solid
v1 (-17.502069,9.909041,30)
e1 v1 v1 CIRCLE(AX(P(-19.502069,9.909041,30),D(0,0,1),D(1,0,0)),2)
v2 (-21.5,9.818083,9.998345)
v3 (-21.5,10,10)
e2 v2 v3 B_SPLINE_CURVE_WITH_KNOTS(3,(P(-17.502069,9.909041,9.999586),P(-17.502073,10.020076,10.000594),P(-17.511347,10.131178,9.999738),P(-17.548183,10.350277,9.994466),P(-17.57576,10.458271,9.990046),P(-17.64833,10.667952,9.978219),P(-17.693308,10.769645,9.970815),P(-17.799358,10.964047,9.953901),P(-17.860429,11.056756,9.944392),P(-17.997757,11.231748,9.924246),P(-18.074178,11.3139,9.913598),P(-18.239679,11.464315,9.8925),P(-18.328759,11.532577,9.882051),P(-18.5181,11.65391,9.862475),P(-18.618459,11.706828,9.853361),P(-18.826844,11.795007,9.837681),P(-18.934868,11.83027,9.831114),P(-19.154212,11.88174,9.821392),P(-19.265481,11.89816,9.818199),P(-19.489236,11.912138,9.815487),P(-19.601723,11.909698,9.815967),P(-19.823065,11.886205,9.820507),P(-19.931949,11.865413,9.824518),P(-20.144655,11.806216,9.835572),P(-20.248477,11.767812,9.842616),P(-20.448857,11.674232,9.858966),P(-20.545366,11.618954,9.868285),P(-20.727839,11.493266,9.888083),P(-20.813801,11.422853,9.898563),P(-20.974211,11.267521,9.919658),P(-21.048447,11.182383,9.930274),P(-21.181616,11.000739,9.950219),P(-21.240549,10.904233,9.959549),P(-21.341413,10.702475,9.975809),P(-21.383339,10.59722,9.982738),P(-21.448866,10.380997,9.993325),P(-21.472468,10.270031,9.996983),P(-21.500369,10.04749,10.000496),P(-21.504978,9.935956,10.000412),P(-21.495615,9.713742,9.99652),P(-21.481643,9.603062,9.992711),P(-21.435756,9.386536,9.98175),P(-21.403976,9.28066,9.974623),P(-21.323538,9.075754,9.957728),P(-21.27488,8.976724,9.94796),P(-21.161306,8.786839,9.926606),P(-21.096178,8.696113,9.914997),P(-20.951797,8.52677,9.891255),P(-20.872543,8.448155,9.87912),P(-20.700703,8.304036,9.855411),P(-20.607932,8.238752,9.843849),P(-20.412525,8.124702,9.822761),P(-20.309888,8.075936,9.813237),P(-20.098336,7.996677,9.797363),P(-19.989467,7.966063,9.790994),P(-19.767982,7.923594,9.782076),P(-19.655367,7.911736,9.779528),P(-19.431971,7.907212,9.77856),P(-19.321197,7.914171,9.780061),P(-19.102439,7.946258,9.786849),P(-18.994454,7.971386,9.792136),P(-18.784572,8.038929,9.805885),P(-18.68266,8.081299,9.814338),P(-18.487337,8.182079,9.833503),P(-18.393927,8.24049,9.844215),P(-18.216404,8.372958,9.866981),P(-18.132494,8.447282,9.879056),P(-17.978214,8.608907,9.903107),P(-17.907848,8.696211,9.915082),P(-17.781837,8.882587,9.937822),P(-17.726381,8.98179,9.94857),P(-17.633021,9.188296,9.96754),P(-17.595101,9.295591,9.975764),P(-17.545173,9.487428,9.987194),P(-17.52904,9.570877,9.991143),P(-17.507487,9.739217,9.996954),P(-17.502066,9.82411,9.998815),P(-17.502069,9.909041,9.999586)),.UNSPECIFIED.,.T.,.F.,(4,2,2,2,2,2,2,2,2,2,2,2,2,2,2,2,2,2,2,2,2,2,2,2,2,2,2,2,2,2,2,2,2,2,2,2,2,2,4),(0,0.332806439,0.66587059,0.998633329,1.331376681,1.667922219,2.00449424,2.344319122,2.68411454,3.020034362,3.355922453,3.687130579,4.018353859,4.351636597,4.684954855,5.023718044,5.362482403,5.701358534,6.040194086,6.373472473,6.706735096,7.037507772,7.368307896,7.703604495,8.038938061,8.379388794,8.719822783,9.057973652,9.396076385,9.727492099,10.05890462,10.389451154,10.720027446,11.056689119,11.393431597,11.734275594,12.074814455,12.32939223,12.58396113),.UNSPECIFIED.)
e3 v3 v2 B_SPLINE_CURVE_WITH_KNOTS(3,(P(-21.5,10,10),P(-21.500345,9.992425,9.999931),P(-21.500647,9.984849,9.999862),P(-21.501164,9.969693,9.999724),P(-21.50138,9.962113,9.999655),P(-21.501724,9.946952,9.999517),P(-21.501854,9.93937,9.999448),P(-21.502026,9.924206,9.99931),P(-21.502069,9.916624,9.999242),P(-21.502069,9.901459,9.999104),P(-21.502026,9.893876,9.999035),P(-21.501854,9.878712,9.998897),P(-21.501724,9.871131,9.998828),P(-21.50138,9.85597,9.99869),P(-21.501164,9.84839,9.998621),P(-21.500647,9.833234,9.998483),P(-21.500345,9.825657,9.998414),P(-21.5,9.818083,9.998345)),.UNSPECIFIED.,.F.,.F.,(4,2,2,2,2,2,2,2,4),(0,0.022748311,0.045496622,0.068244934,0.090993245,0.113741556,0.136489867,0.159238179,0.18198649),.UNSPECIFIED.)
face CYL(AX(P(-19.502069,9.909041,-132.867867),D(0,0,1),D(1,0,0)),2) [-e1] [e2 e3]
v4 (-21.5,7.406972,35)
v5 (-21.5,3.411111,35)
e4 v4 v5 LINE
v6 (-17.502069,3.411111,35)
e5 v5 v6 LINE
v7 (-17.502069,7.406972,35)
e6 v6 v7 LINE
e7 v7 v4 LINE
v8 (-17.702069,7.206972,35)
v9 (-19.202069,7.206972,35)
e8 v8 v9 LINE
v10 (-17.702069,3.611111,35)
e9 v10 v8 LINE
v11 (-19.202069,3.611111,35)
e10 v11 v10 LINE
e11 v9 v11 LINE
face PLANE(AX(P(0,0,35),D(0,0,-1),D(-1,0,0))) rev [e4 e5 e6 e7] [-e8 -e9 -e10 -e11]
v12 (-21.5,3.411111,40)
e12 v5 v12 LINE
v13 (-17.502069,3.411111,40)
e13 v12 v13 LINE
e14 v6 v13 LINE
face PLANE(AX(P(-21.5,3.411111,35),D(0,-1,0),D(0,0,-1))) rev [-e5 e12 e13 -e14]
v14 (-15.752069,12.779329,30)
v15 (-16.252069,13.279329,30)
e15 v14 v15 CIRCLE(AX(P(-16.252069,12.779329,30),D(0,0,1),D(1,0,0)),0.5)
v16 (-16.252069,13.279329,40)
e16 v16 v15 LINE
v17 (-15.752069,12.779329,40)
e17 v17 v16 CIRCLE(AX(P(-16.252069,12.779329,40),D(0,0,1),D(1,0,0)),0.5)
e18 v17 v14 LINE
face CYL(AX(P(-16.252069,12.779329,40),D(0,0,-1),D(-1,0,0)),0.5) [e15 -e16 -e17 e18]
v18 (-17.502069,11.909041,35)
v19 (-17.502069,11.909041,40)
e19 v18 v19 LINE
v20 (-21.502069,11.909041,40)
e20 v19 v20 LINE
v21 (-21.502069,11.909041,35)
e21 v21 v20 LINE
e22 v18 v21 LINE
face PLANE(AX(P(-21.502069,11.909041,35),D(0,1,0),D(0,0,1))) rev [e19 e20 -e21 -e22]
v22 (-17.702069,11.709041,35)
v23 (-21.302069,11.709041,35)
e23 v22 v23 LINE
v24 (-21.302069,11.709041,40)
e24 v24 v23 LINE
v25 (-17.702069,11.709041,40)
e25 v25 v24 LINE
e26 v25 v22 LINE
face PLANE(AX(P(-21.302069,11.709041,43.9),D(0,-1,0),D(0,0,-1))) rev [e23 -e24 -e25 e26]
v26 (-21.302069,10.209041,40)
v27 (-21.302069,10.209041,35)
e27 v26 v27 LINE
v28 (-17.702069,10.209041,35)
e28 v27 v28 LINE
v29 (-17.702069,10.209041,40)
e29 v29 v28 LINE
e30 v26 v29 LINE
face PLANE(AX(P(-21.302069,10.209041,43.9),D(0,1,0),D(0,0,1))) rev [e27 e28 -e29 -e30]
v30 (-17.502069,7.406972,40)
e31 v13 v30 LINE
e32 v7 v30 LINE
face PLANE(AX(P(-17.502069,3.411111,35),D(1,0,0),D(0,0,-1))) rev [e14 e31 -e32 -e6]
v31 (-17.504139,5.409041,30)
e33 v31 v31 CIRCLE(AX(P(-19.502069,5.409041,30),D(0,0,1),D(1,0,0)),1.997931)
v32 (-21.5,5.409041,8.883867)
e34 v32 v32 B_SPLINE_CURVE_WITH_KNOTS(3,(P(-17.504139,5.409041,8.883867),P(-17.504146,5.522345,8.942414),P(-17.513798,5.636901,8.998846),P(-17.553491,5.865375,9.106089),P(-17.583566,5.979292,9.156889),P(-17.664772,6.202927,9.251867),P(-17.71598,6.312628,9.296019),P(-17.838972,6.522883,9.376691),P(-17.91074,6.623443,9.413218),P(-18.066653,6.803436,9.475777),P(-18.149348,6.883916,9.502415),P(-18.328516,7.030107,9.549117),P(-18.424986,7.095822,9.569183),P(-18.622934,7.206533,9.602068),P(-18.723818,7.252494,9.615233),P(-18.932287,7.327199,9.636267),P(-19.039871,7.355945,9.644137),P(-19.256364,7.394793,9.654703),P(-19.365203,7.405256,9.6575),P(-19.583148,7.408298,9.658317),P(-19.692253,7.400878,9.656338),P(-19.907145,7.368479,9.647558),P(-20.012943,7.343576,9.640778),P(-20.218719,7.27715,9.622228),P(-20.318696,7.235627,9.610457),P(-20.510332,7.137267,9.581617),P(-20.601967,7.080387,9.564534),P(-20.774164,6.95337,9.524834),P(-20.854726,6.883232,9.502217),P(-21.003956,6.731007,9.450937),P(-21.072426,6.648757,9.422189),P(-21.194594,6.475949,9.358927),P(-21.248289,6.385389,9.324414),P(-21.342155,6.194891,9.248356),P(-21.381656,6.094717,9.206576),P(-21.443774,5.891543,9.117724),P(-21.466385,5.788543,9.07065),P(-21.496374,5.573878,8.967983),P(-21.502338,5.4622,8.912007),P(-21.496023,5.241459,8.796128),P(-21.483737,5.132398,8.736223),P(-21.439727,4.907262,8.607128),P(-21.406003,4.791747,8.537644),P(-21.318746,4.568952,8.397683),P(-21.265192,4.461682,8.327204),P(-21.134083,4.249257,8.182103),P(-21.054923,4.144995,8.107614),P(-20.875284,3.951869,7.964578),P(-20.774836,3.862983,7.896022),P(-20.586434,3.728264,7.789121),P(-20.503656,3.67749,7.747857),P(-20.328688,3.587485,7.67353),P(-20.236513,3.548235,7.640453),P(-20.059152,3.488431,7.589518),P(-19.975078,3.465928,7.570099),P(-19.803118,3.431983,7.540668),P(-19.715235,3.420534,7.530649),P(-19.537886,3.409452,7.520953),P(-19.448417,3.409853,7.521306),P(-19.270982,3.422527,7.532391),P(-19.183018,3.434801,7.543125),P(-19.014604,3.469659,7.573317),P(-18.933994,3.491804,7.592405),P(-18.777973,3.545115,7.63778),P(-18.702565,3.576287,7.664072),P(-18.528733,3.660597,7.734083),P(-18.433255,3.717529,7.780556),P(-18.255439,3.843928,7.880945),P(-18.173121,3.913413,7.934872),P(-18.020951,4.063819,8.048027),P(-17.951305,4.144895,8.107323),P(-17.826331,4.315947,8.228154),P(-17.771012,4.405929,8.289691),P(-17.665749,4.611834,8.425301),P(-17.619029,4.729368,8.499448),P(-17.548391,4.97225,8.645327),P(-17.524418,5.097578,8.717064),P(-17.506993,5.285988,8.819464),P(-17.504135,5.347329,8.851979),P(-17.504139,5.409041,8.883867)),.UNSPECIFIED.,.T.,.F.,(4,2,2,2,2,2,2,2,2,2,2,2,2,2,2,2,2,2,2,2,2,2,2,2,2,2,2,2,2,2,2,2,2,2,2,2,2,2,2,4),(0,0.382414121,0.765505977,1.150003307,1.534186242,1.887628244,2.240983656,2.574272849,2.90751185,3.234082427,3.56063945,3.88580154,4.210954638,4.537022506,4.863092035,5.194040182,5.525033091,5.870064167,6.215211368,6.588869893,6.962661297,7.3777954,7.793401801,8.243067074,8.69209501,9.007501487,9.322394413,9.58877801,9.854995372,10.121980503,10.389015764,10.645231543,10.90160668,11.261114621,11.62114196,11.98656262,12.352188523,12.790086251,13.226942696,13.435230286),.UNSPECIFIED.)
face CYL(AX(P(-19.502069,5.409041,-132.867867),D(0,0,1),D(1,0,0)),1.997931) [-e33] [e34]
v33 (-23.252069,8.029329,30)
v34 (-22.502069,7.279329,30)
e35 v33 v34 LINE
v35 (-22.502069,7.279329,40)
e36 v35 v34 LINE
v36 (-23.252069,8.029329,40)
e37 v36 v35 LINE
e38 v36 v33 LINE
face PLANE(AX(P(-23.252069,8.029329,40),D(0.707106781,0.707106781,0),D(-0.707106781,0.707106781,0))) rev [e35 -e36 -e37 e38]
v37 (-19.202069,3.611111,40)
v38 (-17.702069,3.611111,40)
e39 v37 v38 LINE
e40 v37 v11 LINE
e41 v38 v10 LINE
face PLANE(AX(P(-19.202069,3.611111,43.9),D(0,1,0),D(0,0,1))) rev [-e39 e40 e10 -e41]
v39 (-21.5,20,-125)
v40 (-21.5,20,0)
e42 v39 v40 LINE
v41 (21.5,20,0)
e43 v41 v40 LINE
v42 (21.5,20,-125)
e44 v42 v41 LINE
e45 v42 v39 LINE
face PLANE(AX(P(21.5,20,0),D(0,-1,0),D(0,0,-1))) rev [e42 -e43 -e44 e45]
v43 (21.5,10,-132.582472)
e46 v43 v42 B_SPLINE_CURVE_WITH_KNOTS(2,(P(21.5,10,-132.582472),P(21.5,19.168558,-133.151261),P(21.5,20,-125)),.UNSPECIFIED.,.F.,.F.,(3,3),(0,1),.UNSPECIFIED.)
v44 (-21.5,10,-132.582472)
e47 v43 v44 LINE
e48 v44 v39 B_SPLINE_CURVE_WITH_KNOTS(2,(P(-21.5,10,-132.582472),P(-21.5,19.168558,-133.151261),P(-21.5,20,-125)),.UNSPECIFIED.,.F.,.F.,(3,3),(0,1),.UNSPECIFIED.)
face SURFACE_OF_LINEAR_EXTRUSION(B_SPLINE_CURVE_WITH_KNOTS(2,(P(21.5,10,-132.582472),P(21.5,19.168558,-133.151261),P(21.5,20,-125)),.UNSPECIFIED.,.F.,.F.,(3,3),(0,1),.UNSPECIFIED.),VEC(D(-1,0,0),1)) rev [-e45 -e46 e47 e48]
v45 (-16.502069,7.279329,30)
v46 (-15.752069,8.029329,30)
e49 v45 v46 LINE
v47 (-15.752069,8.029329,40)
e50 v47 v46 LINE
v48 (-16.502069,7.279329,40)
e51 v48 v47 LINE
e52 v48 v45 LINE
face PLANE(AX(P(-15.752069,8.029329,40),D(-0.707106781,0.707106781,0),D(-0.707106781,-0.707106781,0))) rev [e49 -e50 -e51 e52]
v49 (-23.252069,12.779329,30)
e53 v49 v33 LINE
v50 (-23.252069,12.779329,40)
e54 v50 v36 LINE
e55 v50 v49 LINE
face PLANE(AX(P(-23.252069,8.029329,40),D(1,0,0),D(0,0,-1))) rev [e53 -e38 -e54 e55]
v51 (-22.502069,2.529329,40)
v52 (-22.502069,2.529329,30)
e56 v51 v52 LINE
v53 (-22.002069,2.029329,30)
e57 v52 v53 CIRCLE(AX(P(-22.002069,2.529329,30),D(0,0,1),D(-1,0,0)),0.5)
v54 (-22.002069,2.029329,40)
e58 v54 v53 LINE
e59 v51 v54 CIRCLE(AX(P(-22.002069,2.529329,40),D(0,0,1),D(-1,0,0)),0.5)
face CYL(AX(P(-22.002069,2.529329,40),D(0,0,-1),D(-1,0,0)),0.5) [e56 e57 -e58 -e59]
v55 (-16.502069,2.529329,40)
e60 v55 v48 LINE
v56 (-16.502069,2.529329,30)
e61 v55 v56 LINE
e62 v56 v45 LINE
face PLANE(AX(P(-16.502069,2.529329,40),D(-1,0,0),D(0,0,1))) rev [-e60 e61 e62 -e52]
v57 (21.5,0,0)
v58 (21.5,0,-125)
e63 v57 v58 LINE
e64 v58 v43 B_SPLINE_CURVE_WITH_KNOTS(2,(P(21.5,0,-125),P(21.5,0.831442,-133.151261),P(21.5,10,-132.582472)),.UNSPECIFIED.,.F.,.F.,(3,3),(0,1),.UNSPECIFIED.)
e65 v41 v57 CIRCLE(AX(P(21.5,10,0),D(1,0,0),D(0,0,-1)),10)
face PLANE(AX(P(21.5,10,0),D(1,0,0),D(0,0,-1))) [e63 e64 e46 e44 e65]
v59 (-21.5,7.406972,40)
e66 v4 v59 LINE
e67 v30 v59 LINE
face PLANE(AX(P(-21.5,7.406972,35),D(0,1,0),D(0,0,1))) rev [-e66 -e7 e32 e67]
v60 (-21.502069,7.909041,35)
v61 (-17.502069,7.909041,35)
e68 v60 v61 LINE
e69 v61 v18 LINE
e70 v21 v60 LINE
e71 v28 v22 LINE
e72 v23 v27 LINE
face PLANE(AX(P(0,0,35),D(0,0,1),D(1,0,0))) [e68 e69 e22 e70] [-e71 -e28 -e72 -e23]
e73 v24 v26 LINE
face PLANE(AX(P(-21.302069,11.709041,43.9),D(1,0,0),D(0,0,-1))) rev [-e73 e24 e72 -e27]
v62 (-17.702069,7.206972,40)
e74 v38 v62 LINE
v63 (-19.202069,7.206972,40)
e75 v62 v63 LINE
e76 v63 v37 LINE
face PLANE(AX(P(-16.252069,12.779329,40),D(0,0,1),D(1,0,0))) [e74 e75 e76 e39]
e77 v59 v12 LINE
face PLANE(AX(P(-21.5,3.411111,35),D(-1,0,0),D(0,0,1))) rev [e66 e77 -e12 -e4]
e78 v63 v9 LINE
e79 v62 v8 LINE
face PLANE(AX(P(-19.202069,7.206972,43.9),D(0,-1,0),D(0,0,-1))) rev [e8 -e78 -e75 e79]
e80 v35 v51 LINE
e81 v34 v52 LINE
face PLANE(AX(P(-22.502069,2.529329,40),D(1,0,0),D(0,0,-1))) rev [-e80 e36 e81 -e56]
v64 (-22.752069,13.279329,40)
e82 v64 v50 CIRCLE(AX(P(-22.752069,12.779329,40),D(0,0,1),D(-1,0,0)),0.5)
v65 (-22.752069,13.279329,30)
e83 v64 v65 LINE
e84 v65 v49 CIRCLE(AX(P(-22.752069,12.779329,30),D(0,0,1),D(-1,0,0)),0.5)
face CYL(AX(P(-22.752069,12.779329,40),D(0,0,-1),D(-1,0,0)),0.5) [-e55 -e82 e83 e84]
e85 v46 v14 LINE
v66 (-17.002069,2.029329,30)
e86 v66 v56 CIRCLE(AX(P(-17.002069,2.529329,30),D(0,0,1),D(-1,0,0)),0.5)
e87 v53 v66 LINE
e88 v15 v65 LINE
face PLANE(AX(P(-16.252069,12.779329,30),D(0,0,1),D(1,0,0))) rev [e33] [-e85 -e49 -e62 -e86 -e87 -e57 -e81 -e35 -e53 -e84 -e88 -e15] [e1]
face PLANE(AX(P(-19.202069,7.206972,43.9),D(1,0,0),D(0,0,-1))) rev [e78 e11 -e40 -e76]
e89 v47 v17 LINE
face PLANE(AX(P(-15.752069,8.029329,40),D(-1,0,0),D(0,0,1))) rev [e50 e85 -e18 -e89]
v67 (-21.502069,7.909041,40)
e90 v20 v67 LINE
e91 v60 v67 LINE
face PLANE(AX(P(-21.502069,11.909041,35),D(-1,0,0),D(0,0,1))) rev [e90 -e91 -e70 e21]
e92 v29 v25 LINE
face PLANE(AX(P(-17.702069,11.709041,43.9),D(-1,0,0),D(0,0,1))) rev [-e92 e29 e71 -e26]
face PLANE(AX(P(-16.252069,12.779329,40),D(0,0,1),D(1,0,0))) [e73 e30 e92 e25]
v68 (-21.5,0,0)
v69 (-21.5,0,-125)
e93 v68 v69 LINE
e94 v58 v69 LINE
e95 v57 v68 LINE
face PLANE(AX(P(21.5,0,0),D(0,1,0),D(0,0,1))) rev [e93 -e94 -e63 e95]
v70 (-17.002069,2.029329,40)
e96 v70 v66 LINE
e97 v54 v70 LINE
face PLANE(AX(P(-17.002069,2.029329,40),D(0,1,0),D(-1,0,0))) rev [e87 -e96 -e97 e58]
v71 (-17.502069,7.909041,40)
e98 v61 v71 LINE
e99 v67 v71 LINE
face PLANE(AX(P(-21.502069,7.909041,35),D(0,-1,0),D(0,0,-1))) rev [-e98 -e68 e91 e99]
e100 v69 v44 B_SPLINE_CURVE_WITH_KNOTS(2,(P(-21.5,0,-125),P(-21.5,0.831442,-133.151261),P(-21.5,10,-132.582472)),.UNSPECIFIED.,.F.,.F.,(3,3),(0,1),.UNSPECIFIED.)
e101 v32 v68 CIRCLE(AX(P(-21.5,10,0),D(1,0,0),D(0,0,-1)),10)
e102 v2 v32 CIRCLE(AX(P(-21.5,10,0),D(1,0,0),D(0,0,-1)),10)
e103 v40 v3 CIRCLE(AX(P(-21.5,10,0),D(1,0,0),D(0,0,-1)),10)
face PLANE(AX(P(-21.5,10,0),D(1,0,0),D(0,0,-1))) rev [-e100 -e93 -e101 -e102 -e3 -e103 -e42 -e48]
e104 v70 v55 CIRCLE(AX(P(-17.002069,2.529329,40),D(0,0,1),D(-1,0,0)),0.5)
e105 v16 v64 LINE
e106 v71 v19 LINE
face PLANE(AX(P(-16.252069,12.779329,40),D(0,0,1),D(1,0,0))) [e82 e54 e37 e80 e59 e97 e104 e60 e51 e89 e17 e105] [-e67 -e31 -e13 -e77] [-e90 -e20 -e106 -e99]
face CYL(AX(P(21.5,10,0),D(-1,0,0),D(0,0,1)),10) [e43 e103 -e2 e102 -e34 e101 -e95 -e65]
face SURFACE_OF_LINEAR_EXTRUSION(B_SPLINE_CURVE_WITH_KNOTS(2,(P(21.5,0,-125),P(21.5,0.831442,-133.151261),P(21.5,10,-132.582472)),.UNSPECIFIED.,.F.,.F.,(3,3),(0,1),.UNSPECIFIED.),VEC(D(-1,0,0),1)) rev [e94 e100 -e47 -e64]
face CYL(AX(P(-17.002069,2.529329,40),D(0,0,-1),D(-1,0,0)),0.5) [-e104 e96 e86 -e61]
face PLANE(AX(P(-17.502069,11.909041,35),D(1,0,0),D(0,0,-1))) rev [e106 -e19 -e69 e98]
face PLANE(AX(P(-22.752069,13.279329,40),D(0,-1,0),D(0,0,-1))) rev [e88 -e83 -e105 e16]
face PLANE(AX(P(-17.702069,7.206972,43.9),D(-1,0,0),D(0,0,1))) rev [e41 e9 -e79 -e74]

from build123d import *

# Parameters (mm, degrees)
BOSS_EXTRUDE1_DEPTH      = 21.5
BOSS_EXTRUDE2_REACH      = 167.249
BOSS_EXTRUDE2_END_RADIUS = 10
SKETCH2_R                = 2
SKETCH2_R_2              = 1.997930563
BOSS_EXTRUDE3_DEPTH      = 10
SKETCH4_W                = 4
SKETCH4_H                = 4
SKETCH4_W_2              = 3.997930563
SKETCH4_H_2              = 3.995861126
CUT_EXTRUDE1_DEPTH       = 5
SKETCH5_W                = 3.6
SKETCH5_H                = 1.5
SKETCH5_W_2              = 1.5
SKETCH5_H_2              = 3.595861126
BOSS_EXTRUDE4_DEPTH      = 5


with BuildPart() as part:
    # Sketch1 → Boss-Extrude1 (new, symmetric)
    with BuildSketch(Plane(origin=(0, 0, 0), x_dir=(0, 0, -1), z_dir=(1, 0, 0))):
        with BuildLine():
            Line((0, 0), (125, 0))
            add(Edge.make_bspline(
                [(125, 0), (133.151261209, 0.831442108), (132.582471807, 10)],
                knots=[0, 0, 0, 1, 1, 1], degree=2))
            add(Edge.make_bspline(
                [(125, 20), (133.151261209, 19.168557892), (132.582471807, 10)],
                knots=[0, 0, 0, 1, 1, 1], degree=2))
            Line((125, 20), (0, 20))
            ThreePointArc((0, 20), (-10, 10), (0, 0))
        make_face()
    extrude(amount=BOSS_EXTRUDE1_DEPTH, both=True)

    # Boss-Extrude2: up to this cylinder (the profile starts outside it)
    boss_extrude2_end = Plane(origin=(-19.502069, 10, 0), z_dir=(-1, 0, 0)) * Cylinder(BOSS_EXTRUDE2_END_RADIUS, 355.498, mode=Mode.PRIVATE)
    # Sketch2 → Boss-Extrude2 (add, up to the surface)
    with BuildSketch(Plane.XY.offset(30), mode=Mode.PRIVATE) as boss_extrude2_sk1:
        with Locations((-19.502069437, 9.909041412)):
            Circle(SKETCH2_R)
    boss_extrude2_tool1 = extrude(boss_extrude2_sk1.sketch, amount=-BOSS_EXTRUDE2_REACH, mode=Mode.PRIVATE) - boss_extrude2_end
    add(boss_extrude2_tool1.solids().sort_by_distance((-19.502069, 9.909041, 30))[0])
    # Sketch2 → Boss-Extrude2 (add, up to the surface)
    with BuildSketch(Plane.XY.offset(30), mode=Mode.PRIVATE) as boss_extrude2_sk2:
        with Locations((-19.502069437, 5.409041412)):
            Circle(SKETCH2_R_2)
    boss_extrude2_tool2 = extrude(boss_extrude2_sk2.sketch, amount=-BOSS_EXTRUDE2_REACH, mode=Mode.PRIVATE) - boss_extrude2_end
    add(boss_extrude2_tool2.solids().sort_by_distance((-19.502069, 5.409041, 30))[0])

    # Sketch3 → Boss-Extrude3 (add)
    with BuildSketch(Plane.XY.offset(30)):
        with BuildLine():
            Line((-17.002069437, 2.029329274), (-22.002069437, 2.029329274))
            ThreePointArc((-22.002069437, 2.029329274), (-22.355622827, 2.175775884), (-22.502069437, 2.529329274))
            Line((-22.502069437, 2.529329274), (-22.502069437, 7.279329274))
            Line((-22.502069437, 7.279329274), (-23.252069437, 8.029329274))
            Line((-23.252069437, 8.029329274), (-23.252069437, 12.779329274))
            ThreePointArc((-23.252069437, 12.779329274), (-23.105622827, 13.132882665), (-22.752069437, 13.279329274))
            Line((-22.752069437, 13.279329274), (-16.252069437, 13.279329274))
            ThreePointArc((-16.252069437, 13.279329274), (-15.898516046, 13.132882665), (-15.752069437, 12.779329274))
            Line((-15.752069437, 12.779329274), (-15.752069437, 8.029329274))
            Line((-15.752069437, 8.029329274), (-16.502069437, 7.279329274))
            Line((-16.502069437, 7.279329274), (-16.502069437, 2.529329274))
            ThreePointArc((-16.502069437, 2.529329274), (-16.648516046, 2.175775884), (-17.002069437, 2.029329274))
        make_face()
    extrude(amount=BOSS_EXTRUDE3_DEPTH)

    # Sketch4 → Cut-Extrude1 (cut)
    with BuildSketch(Plane.XY.offset(40)):
        with Locations((-19.502069437, 9.909041412)):
            Rectangle(SKETCH4_W, SKETCH4_H)
        with Locations((-19.501034719, 5.409041412)):
            Rectangle(SKETCH4_W_2, SKETCH4_H_2)
    extrude(amount=-CUT_EXTRUDE1_DEPTH, mode=Mode.SUBTRACT)

    # Sketch5 → Boss-Extrude4 (add)
    with BuildSketch(Plane.XY.offset(35)):
        with Locations((-19.502069437, 10.959041412)):
            Rectangle(SKETCH5_W, SKETCH5_H)
        with Locations((-18.452069437, 5.409041412)):
            Rectangle(SKETCH5_W_2, SKETCH5_H_2)
    extrude(amount=BOSS_EXTRUDE4_DEPTH)


solid = part.part
